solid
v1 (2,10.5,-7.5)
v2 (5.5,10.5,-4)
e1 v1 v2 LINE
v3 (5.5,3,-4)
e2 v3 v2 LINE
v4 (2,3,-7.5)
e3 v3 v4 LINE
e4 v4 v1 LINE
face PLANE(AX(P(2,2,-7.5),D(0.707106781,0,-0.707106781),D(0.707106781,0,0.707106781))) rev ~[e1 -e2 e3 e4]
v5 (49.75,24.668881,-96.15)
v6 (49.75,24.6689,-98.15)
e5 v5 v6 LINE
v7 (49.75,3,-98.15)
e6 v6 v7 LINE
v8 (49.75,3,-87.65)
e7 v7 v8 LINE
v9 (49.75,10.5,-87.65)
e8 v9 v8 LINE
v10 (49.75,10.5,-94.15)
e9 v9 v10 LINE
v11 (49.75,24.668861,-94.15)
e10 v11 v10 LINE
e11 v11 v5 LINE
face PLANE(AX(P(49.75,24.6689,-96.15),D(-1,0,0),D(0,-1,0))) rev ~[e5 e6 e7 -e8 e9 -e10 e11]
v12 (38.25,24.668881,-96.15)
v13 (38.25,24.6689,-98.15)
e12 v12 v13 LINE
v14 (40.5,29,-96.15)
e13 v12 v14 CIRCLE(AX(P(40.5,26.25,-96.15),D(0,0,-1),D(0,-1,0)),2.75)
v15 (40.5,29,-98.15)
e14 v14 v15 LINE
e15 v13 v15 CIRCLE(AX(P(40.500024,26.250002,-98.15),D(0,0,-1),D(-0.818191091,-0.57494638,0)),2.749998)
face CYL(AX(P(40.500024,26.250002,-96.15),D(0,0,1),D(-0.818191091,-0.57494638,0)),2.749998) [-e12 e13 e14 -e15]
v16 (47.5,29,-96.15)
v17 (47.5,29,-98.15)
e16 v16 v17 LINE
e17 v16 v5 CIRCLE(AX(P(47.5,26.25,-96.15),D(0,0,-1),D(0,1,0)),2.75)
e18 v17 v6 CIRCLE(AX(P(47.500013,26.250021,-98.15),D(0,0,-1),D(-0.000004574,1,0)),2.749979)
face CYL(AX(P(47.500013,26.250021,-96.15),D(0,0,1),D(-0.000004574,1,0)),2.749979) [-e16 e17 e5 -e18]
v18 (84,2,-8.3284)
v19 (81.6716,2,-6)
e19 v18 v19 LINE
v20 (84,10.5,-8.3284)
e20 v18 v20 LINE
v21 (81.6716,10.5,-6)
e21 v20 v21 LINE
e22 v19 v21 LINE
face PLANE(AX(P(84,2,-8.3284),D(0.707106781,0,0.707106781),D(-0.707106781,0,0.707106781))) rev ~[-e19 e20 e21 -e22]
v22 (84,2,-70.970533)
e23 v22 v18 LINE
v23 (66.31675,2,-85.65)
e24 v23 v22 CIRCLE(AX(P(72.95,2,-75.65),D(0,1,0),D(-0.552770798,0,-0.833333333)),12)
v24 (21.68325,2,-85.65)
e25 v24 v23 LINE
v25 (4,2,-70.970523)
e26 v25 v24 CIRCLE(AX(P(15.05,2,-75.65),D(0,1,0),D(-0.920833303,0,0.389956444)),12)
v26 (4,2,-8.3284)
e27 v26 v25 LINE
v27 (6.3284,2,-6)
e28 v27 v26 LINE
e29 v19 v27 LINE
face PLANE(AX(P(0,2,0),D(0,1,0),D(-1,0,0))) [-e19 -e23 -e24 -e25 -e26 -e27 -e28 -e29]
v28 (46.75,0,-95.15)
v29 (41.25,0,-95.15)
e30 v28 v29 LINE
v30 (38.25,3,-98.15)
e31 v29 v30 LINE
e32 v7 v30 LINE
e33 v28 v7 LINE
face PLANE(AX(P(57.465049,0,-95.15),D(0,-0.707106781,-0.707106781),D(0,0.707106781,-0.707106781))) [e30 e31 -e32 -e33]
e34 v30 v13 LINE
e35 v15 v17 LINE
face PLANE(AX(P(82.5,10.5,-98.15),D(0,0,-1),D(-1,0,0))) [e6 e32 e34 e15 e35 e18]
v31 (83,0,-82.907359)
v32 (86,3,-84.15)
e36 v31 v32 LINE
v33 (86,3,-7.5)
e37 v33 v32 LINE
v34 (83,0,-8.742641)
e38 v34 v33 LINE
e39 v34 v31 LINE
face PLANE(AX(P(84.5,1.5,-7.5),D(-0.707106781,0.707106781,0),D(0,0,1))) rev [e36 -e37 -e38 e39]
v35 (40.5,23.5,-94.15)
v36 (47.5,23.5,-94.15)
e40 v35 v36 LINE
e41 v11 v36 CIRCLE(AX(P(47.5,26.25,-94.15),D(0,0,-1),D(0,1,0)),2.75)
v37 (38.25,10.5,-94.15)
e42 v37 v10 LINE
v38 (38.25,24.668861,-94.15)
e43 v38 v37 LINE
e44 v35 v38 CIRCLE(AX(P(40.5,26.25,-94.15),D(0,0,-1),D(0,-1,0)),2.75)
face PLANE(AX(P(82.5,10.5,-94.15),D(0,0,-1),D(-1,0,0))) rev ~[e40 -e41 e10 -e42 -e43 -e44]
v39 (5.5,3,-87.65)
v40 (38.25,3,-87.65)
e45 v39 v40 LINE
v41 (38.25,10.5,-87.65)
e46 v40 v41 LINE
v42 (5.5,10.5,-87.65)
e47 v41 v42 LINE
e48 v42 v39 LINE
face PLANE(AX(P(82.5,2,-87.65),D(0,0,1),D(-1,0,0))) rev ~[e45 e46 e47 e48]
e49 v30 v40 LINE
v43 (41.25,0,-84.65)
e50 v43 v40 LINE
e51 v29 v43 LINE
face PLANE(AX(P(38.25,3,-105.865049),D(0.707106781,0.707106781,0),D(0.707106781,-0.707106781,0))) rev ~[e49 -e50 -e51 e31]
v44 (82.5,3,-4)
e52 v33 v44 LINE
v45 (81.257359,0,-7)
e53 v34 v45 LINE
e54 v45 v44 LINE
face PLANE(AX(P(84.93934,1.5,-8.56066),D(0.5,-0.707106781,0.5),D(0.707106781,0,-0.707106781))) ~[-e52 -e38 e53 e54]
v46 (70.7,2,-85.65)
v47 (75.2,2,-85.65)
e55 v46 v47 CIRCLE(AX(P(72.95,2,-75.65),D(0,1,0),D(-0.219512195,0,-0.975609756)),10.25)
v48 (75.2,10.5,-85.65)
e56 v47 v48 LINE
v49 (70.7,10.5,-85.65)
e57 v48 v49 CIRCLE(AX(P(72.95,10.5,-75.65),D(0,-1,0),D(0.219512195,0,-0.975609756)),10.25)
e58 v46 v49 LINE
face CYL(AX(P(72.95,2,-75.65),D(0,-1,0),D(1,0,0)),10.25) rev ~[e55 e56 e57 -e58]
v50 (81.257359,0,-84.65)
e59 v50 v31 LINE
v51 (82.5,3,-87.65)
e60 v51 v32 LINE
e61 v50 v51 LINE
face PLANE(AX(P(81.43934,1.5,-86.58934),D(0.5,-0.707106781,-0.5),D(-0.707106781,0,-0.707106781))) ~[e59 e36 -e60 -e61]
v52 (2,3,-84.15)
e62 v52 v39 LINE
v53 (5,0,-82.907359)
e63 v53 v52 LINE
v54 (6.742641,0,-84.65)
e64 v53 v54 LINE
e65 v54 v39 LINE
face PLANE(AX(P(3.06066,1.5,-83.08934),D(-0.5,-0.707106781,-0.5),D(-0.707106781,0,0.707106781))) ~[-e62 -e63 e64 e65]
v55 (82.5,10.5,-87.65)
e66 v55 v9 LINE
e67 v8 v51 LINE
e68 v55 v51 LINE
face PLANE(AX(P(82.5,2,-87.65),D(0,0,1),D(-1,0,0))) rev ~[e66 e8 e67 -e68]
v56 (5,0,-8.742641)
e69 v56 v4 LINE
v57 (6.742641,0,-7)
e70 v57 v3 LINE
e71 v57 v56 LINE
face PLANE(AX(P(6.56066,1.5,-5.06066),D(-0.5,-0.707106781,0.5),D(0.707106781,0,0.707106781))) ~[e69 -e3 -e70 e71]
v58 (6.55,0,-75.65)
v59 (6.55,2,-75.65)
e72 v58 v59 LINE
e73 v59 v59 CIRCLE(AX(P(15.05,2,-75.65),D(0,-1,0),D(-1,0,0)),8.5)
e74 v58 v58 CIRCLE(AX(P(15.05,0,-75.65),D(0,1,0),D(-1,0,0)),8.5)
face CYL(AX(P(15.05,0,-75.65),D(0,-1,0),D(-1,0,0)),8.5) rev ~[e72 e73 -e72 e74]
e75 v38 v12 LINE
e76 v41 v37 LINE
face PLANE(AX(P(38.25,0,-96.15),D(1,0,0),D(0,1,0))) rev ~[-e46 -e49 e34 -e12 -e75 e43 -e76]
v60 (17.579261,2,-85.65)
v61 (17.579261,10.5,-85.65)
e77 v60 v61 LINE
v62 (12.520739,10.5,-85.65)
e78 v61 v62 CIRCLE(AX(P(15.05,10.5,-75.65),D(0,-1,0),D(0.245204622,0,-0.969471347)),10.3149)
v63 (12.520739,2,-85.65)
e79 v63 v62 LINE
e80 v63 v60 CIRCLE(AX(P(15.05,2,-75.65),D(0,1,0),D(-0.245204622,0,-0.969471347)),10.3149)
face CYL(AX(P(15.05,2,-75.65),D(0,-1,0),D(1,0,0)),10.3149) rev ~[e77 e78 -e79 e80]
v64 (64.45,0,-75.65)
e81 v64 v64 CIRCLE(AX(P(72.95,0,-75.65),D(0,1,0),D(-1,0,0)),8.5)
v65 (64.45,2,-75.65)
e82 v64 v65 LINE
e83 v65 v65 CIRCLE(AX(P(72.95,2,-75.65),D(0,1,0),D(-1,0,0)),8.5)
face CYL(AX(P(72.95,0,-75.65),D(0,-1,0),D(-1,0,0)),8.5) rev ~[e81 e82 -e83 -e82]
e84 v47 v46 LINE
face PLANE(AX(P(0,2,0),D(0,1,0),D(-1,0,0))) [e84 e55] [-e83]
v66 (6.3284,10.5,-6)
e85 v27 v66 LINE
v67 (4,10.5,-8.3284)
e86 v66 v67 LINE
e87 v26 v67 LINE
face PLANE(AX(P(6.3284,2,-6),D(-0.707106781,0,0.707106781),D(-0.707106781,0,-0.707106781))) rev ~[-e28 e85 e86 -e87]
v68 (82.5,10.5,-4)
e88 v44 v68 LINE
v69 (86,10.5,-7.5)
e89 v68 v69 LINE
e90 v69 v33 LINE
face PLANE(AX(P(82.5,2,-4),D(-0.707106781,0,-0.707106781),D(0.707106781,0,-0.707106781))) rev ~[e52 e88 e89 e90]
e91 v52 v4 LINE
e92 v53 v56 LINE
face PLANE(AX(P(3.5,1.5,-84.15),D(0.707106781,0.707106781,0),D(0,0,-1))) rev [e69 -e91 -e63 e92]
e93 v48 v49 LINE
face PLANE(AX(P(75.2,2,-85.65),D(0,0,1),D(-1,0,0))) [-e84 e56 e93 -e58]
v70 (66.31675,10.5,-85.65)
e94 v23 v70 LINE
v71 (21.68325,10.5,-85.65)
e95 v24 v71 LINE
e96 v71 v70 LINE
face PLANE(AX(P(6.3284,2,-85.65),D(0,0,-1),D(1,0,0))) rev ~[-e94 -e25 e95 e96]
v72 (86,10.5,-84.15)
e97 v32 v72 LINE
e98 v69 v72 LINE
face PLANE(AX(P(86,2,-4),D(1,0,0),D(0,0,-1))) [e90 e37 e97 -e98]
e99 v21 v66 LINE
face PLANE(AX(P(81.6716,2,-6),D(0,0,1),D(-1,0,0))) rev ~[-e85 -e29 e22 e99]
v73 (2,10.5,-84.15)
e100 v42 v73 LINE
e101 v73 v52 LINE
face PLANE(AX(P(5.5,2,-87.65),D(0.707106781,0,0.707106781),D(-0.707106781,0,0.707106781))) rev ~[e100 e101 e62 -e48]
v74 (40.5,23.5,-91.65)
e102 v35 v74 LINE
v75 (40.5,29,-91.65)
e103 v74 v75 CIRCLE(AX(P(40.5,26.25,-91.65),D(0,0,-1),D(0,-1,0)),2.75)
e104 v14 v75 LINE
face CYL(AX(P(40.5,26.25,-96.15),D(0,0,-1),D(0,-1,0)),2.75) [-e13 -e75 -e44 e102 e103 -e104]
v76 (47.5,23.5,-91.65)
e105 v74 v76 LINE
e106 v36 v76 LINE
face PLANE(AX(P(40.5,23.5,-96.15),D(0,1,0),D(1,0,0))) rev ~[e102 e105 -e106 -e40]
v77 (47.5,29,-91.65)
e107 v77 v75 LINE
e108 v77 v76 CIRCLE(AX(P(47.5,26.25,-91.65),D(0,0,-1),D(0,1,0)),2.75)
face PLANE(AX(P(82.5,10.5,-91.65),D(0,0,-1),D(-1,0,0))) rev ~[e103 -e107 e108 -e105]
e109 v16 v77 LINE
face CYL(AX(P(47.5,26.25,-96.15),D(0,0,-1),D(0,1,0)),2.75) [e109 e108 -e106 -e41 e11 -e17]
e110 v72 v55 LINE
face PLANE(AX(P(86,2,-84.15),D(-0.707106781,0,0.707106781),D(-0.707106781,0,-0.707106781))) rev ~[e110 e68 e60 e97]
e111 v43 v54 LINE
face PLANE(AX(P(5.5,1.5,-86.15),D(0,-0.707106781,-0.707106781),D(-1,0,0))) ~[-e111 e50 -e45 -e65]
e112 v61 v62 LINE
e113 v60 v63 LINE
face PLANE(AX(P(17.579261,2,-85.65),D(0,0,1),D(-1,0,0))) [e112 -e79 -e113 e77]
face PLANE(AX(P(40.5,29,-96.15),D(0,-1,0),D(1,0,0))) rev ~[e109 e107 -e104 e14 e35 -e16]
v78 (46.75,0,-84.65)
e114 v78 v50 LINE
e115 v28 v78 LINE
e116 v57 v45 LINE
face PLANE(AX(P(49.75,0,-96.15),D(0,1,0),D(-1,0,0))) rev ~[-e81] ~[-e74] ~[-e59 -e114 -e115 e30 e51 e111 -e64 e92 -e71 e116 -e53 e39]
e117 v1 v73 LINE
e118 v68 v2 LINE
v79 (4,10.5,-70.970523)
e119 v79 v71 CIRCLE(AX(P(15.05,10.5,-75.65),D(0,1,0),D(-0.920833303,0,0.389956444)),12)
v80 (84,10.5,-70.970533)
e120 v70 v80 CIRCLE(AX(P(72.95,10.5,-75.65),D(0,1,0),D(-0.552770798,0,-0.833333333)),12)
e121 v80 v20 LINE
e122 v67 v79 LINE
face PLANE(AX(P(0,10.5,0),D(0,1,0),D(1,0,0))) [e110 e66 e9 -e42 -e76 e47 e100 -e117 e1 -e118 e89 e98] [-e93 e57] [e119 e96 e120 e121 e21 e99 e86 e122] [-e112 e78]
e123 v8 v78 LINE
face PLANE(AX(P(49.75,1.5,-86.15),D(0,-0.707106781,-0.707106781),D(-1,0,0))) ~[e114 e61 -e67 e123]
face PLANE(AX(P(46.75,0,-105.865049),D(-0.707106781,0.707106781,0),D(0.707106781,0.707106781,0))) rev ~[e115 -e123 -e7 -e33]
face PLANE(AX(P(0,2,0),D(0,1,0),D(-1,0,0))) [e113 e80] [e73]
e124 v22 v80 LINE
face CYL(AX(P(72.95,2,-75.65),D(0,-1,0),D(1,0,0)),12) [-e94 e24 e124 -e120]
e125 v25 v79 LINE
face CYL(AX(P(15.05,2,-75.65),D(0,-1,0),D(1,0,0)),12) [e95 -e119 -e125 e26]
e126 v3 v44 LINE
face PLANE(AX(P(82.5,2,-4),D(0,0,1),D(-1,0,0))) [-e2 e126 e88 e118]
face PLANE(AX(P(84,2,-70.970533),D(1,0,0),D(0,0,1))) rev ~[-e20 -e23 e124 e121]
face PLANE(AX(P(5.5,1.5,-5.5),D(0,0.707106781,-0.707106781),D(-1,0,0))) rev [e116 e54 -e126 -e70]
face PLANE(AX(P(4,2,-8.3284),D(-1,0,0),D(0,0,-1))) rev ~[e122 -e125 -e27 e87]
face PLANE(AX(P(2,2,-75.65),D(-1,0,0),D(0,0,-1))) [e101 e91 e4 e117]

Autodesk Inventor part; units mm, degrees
ref_plane "YZ Plane" through (0, 0, 0) normal (1, 0, 0) x (0, 1, 0)
ref_plane "XZ Plane" through (0, 0, 0) normal (0, 1, 0) x (-1, 0, 0)
ref_plane "XY Plane" through (0, 0, 0) normal (0, 0, 1) x (1, 0, 0)
sketch "Sketch1" plane through (0, 0, 0) normal (0, 1, 0) x (-1, 0, 0)
  line L0 (0, 0) -> (-88, 0)
  line L1 (-88, 0) -> (-88, -94)
  line L2 (-88, -94) -> (0, -94)
  line L3 (0, -94) -> (0, 0)
  line L4 (0, -94) -> (0, -75.65)
  line L5 (0, -94) -> (-15.05, -94)
  circle A0 centre (-15.05, -75.65) radius 8.5
  line L6 (-44, -88.9444) -> (-44, -54.2543) construction
  circle A1 centre (-72.95, -75.65) radius 8.5
  line L7 (-15.05, -94) -> (-15.05, -77.2221)
  line L8 (-15.05, -77.2221) -> (-15.05, -73.1555)
  dimension "d0" = 88
  dimension "d1" = 94
  dimension "d2" = 18.35
  dimension "d3" = 15.05
  dimension "d4" = 17
  dimension "d48" = 17
extrude "Extrusion1" add sketch "Sketch1" along normal blind 2
sketch "Sketch3" plane through (0, 2, 0) normal (0, 1, 0) x (1, 0, 0)
  circle A0 centre (72.95, 75.65) radius 8.5 construction
  circle A1 centre (15.05, 75.65) radius 8.5 construction
  line L0 (0, 0) -> (4, 0) construction
  line L1 (4, 0) -> (4, 6) construction
  line L2 (4, 6) -> (0, 6) construction
  line L3 (0, 6) -> (0, 0) construction
  line L4 (88, 0) -> (84, 0) construction
  line L5 (84, 0) -> (84, 6) construction
  line L6 (84, 6) -> (88, 6) construction
  line L7 (88, 6) -> (88, 0) construction
  line L8 (4, 6) -> (2, 6) construction
  line L9 (2, 6) -> (2, 4) construction
  line L10 (2, 4) -> (4, 4) construction
  line L11 (4, 4) -> (4, 6) construction
  line L12 (2, 4) -> (6, 4)
  line L13 (6, 4) -> (6, 6)
  line L14 (6, 6) -> (2, 6)
  line L15 (2, 6) -> (2, 4)
  line L16 (2, 4) -> (4, 4)
  line L17 (4, 4) -> (4, 8)
  line L18 (4, 8) -> (2, 8)
  line L19 (2, 8) -> (2, 4)
  line L20 (86, 4) -> (82, 4)
  line L21 (82, 4) -> (82, 4)
  line L22 (82, 4) -> (86, 4)
  line L23 (86, 4) -> (86, 4)
  line L24 (86, 4) -> (84, 4)
  line L25 (84, 4) -> (84, 8)
  line L26 (84, 8) -> (86, 8)
  line L27 (86, 8) -> (86, 4)
  line L28 (44, 4.3599) -> (37, 4.3599) construction
  line L29 (88, -1) -> (0, -1) construction
  line L30 (37, -1) -> (51, -1) construction
  line L31 (51, -1) -> (51, 0) construction
  line L32 (51, 0) -> (37, 0) construction
  line L33 (37, 0) -> (37, -1) construction
  line L34 (37, -1) -> (51, -1)
  line L35 (51, -1) -> (51, 0)
  line L36 (51, 0) -> (37, 0)
  line L37 (37, 0) -> (37, -1)
  line L38 (0, 95) -> (88, 95) projected
  line L39 (37, 95) -> (51, 95)
  line L40 (51, 95) -> (51, 94)
  line L41 (51, 94) -> (37, 94)
  line L42 (37, 94) -> (37, 95)
  circle A2 centre (15.05, 75.65) radius 10.5
  circle A3 centre (15.05, 75.65) radius 12
  line L43 (15.05, 75.65) -> (27.05, 75.65) construction
  line L44 (15.05, 75.65) -> (21.05, 86.0423) construction
  line L45 (15.05, 75.65) -> (9.05, 86.0423) construction
  line L46 (15.05, 75.65) -> (3.05, 75.65) construction
  line L47 (15.05, 75.65) -> (9.05, 65.2577) construction
  line L48 (15.05, 75.65) -> (21.05, 65.2577) construction
  line L49 (9.8, 84.7433) -> (9.05, 86.0423) construction
  line L50 (9.8, 84.7433) -> (9.05, 86.0423)
  line L51 (21.05, 86.0423) -> (20.3, 84.7433)
  line L52 (25.55, 75.65) -> (27.05, 75.65)
  line L53 (21.05, 65.2577) -> (20.3, 66.5567)
  line L54 (9.8, 66.5567) -> (9.05, 65.2577)
  line L55 (4.55, 75.65) -> (3.05, 75.65)
  line L56 (44, 84.7433) -> (44, 74.6259) construction
  circle A4 centre (72.95, 75.65) radius 8.5 construction
  circle A5 centre (72.95, 75.65) radius 10.5
  circle A6 centre (72.95, 75.65) radius 12
  line L57 (72.95, 75.65) -> (60.95, 75.65) construction
  line L58 (72.95, 75.65) -> (66.95, 86.0423) construction
  line L59 (72.95, 75.65) -> (78.95, 86.0423) construction
  line L60 (72.95, 75.65) -> (84.95, 75.65) construction
  line L61 (72.95, 75.65) -> (78.95, 65.2577) construction
  line L62 (72.95, 75.65) -> (66.95, 65.2577) construction
  line L63 (78.2, 84.7433) -> (78.95, 86.0423) construction
  line L64 (78.2, 84.7433) -> (78.95, 86.0423)
  line L65 (66.95, 86.0423) -> (67.7, 84.7433)
  line L66 (62.45, 75.65) -> (60.95, 75.65)
  line L67 (66.95, 65.2577) -> (67.7, 66.5567)
  line L68 (78.2, 66.5567) -> (78.95, 65.2577)
  line L69 (83.45, 75.65) -> (84.95, 75.65)
  line L70 (86, 4) -> (82, 4)
  line L71 (82, 4) -> (82, 6)
  line L72 (82, 6) -> (86, 6)
  line L73 (86, 6) -> (86, 4)
  point P0 (2, 4)
  point P1 (4, 6)
  point P2 (84, 4)
  point P3 (84.95, 75.65)
  point P4 (78.95, 65.2577)
  point P5 (3.05, 75.65)
  point P6 (9.05, 65.2577)
  point P7 (84, 6)
  dimension "d11" = 4
  dimension "d12" = 6
  dimension "d13" = 4
  dimension "d14" = 6
  dimension "d15" = 2
  dimension "d16" = 2
  dimension "d17" = 4
  dimension "d18" = 4
  dimension "d19" = 4
  dimension "d20" = 2
  dimension "d21" = 4
  dimension "d22" = 7
  dimension "d23" = 14
  dimension "d24" = 14
  dimension "d25" = 1
  dimension "d26" = 2
  dimension "d27" = 1.5
  dimension "d30" = 360
extrude "Extrusion3" add sketch "Sketch3" along normal blind 8.5 contours L52 A3 L53 A2 | A2 L50 A3 L51 | L54 A3 L55 A2 | L69 A6 L68 A5 | A5 L65 A6 L64 | L67 A6 L66 A5
sketch "Sketch7" plane through (0, 2, 0) normal (0, 1, 0) x (1, 0, 0)
  line L0 (3.05, 75.65) -> (4.55, 75.65) construction
  arc A0 (4.55, 75.65) -> (9.8, 66.5567) centre (15.05, 75.65) ccw construction
  line L1 (9.8, 66.5567) -> (9.05, 65.2577) construction
  arc A1 (3.05, 75.65) -> (9.05, 65.2577) centre (15.05, 75.65) ccw construction
  arc A2 (78.95, 65.2577) -> (84.95, 75.65) centre (72.95, 75.65) ccw construction
  line L2 (78.95, 65.2577) -> (78.2, 66.5567) construction
  arc A3 (78.2, 66.5567) -> (83.45, 75.65) centre (72.95, 75.65) ccw construction
  line L3 (83.45, 75.65) -> (84.95, 75.65) construction
  arc A4 (78.2, 84.7433) -> (67.7, 84.7433) centre (72.95, 75.65) ccw construction
  line L4 (67.7, 84.7433) -> (66.95, 86.0423) construction
  arc A5 (78.95, 86.0423) -> (66.95, 86.0423) centre (72.95, 75.65) ccw construction
  line L5 (78.95, 86.0423) -> (78.2, 84.7433) construction
  line L6 (21.05, 86.0423) -> (20.3, 84.7433) construction
  arc A6 (20.3, 84.7433) -> (9.8, 84.7433) centre (15.05, 75.65) ccw construction
  line L7 (9.8, 84.7433) -> (9.05, 86.0423) construction
  arc A7 (21.05, 86.0423) -> (9.05, 86.0423) centre (15.05, 75.65) ccw construction
  arc A8 (62.45, 75.65) -> (67.7, 66.5567) centre (72.95, 75.65) ccw construction
  line L8 (67.7, 66.5567) -> (66.95, 65.2577) construction
  arc A9 (60.95, 75.65) -> (66.95, 65.2577) centre (72.95, 75.65) ccw construction
  line L9 (60.95, 75.65) -> (62.45, 75.65) construction
  line L10 (25.55, 75.65) -> (27.05, 75.65) construction
  arc A10 (21.05, 65.2577) -> (27.05, 75.65) centre (15.05, 75.65) ccw construction
  line L11 (21.05, 65.2577) -> (20.3, 66.5567) construction
  arc A11 (20.3, 66.5567) -> (25.55, 75.65) centre (15.05, 75.65) ccw construction
  line L12 (88, 94) -> (0, 94) construction
  line L13 (0, 94) -> (0, 0) construction
  line L14 (0, 0) -> (88, 0) construction
  line L15 (88, 0) -> (88, 94) construction
  circle A12 centre (72.95, 75.65) radius 8.5 construction
  circle A13 centre (15.05, 75.65) radius 8.5 construction
  line L16 (2, 4) -> (86, 4) construction
  line L17 (86, 4) -> (86, 94) construction
  line L18 (86, 94) -> (2, 94) construction
  line L19 (2, 94) -> (2, 4) construction
  line L20 (0, 0) -> (88, 0)
  line L21 (88, 0) -> (88, 94)
  line L22 (88, 94) -> (0, 94)
  line L23 (0, 94) -> (0, 0)
  line L24 (86, 94) -> (2, 94)
  line L25 (2, 94) -> (2, 4)
  line L26 (2, 4) -> (86, 4)
  line L27 (86, 4) -> (86, 94)
  point P0 (2, 94)
extrude "Extrusion7" cut sketch "Sketch7" against normal up to surface (2 mm away) contours L23 L22 L25 L26 L27 L21 L20
sketch "Sketch8" plane through (0, 2, 0) normal (0, 1, 0) x (1, 0, 0)
  circle A0 centre (15.05, 75.65) radius 8.5 projected
  circle A1 centre (72.95, 75.65) radius 8.5 projected
  line L0 (86, 4) -> (86, 94) projected
  line L1 (86, 94) -> (2, 94) projected
  line L2 (2, 94) -> (2, 4) projected
  line L3 (3.05, 75.65) -> (4.55, 75.65) projected
  arc A2 (4.55, 75.65) -> (9.8, 66.5567) centre (15.05, 75.65) ccw projected
  line L4 (9.8, 66.5567) -> (9.05, 65.2577) projected
  arc A3 (3.05, 75.65) -> (9.05, 65.2577) centre (15.05, 75.65) ccw projected
  arc A4 (78.95, 65.2577) -> (84.95, 75.65) centre (72.95, 75.65) ccw projected
  line L5 (78.95, 65.2577) -> (78.2, 66.5567) projected
  arc A5 (78.2, 66.5567) -> (83.45, 75.65) centre (72.95, 75.65) ccw projected
  line L6 (83.45, 75.65) -> (84.95, 75.65) projected
  line L7 (25.55, 75.65) -> (27.05, 75.65) projected
  arc A6 (21.05, 65.2577) -> (27.05, 75.65) centre (15.05, 75.65) ccw projected
  line L8 (21.05, 65.2577) -> (20.3, 66.5567) projected
  arc A7 (20.3, 66.5567) -> (25.55, 75.65) centre (15.05, 75.65) ccw projected
  arc A8 (62.45, 75.65) -> (67.7, 66.5567) centre (72.95, 75.65) ccw projected
  line L9 (67.7, 66.5567) -> (66.95, 65.2577) projected
  arc A9 (60.95, 75.65) -> (66.95, 65.2577) centre (72.95, 75.65) ccw projected
  line L10 (60.95, 75.65) -> (62.45, 75.65) projected
  line L11 (21.05, 86.0423) -> (20.3, 84.7433) projected
  arc A10 (20.3, 84.7433) -> (9.8, 84.7433) centre (15.05, 75.65) ccw projected
  line L12 (9.8, 84.7433) -> (9.05, 86.0423) projected
  arc A11 (21.05, 86.0423) -> (9.05, 86.0423) centre (15.05, 75.65) ccw projected
  arc A12 (78.2, 84.7433) -> (67.7, 84.7433) centre (72.95, 75.65) ccw projected
  line L13 (67.7, 84.7433) -> (66.95, 86.0423) projected
  arc A13 (78.95, 86.0423) -> (66.95, 86.0423) centre (72.95, 75.65) ccw projected
  line L14 (78.95, 86.0423) -> (78.2, 84.7433) projected
  line L15 (86, 4) -> (2, 4) projected
  line L16 (2, 75.65) -> (86, 75.65)
  line L17 (86, 75.65) -> (86, 7.5)
  line L18 (82.5, 4) -> (5.5, 4)
  line L19 (2, 7.5) -> (2, 75.65)
  line L20 (2, 7.5) -> (5.5, 4)
  line L21 (82.5, 4) -> (86, 7.5)
  line L22 (4, 73.65) -> (84, 73.65)
  line L23 (84, 73.65) -> (84, 8.3284)
  line L24 (84, 8.3284) -> (81.6716, 6)
  line L25 (81.6716, 6) -> (6.3284, 6)
  line L26 (6.3284, 6) -> (4, 8.3284)
  line L27 (4, 8.3284) -> (4, 73.65)
  line L28 (2, 4) -> (86, 4) projected
  point P0 (0, 0)
  point P1 (2, 4)
  point P2 (4, 70.9705)
  point P3 (3.05, 75.65)
  point P4 (5.5, 4)
  point P5 (84.95, 75.65)
  point P6 (84, 70.9705)
  dimension "d51" = 3.5
  dimension "d52" = 3.5
  dimension "d53" = 3.5
  dimension "d54" = 3.5
  dimension "d55" = 2
extrude "Extrusion8" add sketch "Sketch8" along normal blind 8.5 contours A3 L27 L26 L25 L24 L23 A4 L16 L0 L21 L15 L20 L2
sketch "Sketch9" plane through (0, 2, 0) normal (0, 1, 0) x (1, 0, 0)
  line L0 (5.5, 4) -> (2, 7.5) projected
  line L1 (2, 7.5) -> (2, 4) projected
  line L2 (2, 4) -> (5.5, 4) projected
  line L3 (86, 4) -> (86, 7.5) projected
  line L4 (86, 7.5) -> (82.5, 4) projected
  line L5 (82.5, 4) -> (86, 4) projected
  line L6 (86, 4) -> (86, 7.5) projected
  line L7 (86, 94) -> (2, 94) projected
  line L8 (5.5, 4) -> (82.5, 4) projected
  line L9 (44, 4) -> (44, 94)
  line L10 (44, 49) -> (73.8977, 49)
  line L11 (5.5, 94) -> (2, 90.5)
  line L12 (2, 90.5) -> (2, 94)
  line L13 (2, 94) -> (5.5, 94)
  line L14 (86, 94) -> (86, 90.5)
  line L15 (86, 90.5) -> (82.5, 94)
  line L16 (82.5, 94) -> (86, 94)
  line L17 (86, 94) -> (86, 90.5)
  line L18 (5.5, 94) -> (82.5, 94)
  point P0 (0, 0)
  point P1 (0, 98)
extrude "Extrusion9" cut sketch "Sketch9" against normal blind 10 contours L2 L1 L0 | L5 L4 L3
sketch "Sketch10" plane through (0, 2, 0) normal (0, 1, 0) x (1, 0, 0)
  circle A0 centre (15.05, 75.65) radius 8.5 construction
  circle A1 centre (72.95, 75.65) radius 8.5 construction
  line L0 (21.05, 86.0423) -> (20.3, 84.7433) construction
  arc A2 (20.3, 84.7433) -> (9.8, 84.7433) centre (15.05, 75.65) ccw construction
  line L1 (9.8, 84.7433) -> (9.05, 86.0423) construction
  arc A3 (21.05, 86.0423) -> (9.05, 86.0423) centre (15.05, 75.65) ccw construction
  arc A4 (78.2, 84.7433) -> (67.7, 84.7433) centre (72.95, 75.65) ccw construction
  line L2 (67.7, 84.7433) -> (66.95, 86.0423) construction
  arc A5 (78.95, 86.0423) -> (66.95, 86.0423) centre (72.95, 75.65) ccw construction
  line L3 (78.95, 86.0423) -> (78.2, 84.7433) construction
  line L4 (25.55, 75.65) -> (27.05, 75.65) construction
  arc A6 (21.05, 65.2577) -> (27.05, 75.65) centre (15.05, 75.65) ccw construction
  line L5 (21.05, 65.2577) -> (20.3, 66.5567) construction
  arc A7 (20.3, 66.5567) -> (25.55, 75.65) centre (15.05, 75.65) ccw construction
  arc A8 (62.45, 75.65) -> (67.7, 66.5567) centre (72.95, 75.65) ccw construction
  line L6 (67.7, 66.5567) -> (66.95, 65.2577) construction
  arc A9 (60.95, 75.65) -> (66.95, 65.2577) centre (72.95, 75.65) ccw construction
  line L7 (60.95, 75.65) -> (62.45, 75.65) construction
  line L8 (83.45, 75.65) -> (86, 75.65) construction
  line L9 (86, 75.65) -> (86, 94) construction
  line L10 (86, 94) -> (2, 94) construction
  line L11 (2, 94) -> (2, 75.65) construction
  line L12 (2, 75.65) -> (4.55, 75.65) construction
  arc A10 (4.55, 75.65) -> (9.8, 66.5567) centre (15.05, 75.65) ccw construction
  line L13 (9.8, 66.5567) -> (9.05, 65.2577) construction
  arc A11 (4, 70.9705) -> (9.05, 65.2577) centre (15.05, 75.65) ccw construction
  line L14 (4, 70.9705) -> (4, 8.3284) construction
  line L15 (4, 8.3284) -> (6.3284, 6) construction
  line L16 (6.3284, 6) -> (81.6716, 6) construction
  line L17 (81.6716, 6) -> (84, 8.3284) construction
  line L18 (84, 8.3284) -> (84, 70.9705) construction
  arc A12 (78.95, 65.2577) -> (84, 70.9705) centre (72.95, 75.65) ccw construction
  line L19 (78.95, 65.2577) -> (78.2, 66.5567) construction
  arc A13 (78.2, 66.5567) -> (83.45, 75.65) centre (72.95, 75.65) ccw construction
  line L20 (15.05, 87.65) -> (72.95, 87.65) construction
  line L21 (72.95, 87.65) -> (82.5, 87.65) construction
  line L22 (86, 75.65) -> (86, 84.15) construction
  line L23 (82.5, 87.65) -> (86, 84.15) construction
  line L24 (15.05, 87.65) -> (5.5, 87.65) construction
  arc A14 (21.05, 86.0423) -> (9.05, 86.0423) centre (15.05, 75.65) ccw construction
  line L25 (2, 75.65) -> (2, 84.15) construction
  line L26 (5.5, 87.65) -> (2, 84.15) construction
  line L27 (4, 75.65) -> (4, 83.3216) construction
  line L28 (4, 83.3216) -> (6.3284, 85.65) construction
  line L29 (6.3284, 85.65) -> (14.65, 85.65) construction
  line L30 (14.65, 85.65) -> (72.95, 85.65) construction
  line L31 (72.95, 85.65) -> (81.6716, 85.65) construction
  line L32 (81.6716, 85.65) -> (84, 83.3216) construction
  line L33 (84, 83.3216) -> (84, 75.65) construction
  line L34 (2, 75.65) -> (4, 75.65)
  line L35 (4, 75.65) -> (4, 83.3216)
  line L36 (6.3284, 85.65) -> (4, 83.3216)
  line L37 (6.3284, 85.65) -> (81.6716, 85.65)
  line L38 (81.6716, 85.65) -> (84, 83.3216)
  line L39 (84, 83.3216) -> (84, 75.65)
  line L40 (84, 75.65) -> (86, 75.65)
  line L41 (86, 7.5) -> (86, 75.65) projected
  line L42 (86, 75.65) -> (86, 84.15)
  line L43 (86, 84.15) -> (82.5, 87.65)
  line L44 (82.5, 87.65) -> (5.5, 87.65)
  line L45 (5.5, 87.65) -> (2, 84.15)
  line L46 (2, 75.65) -> (2, 84.15)
  point P0 (0, 0)
  point P1 (86, 87.65)
  point P2 (2, 87.65)
  dimension "d60" = 3.5
  dimension "d61" = 3.5
  dimension "d62" = 3.5
  dimension "d63" = 3.5
  dimension "d64" = 2
extrude "Extrusion10" add sketch "Sketch10" along normal blind 8.5
sketch "Sketch11" plane through (0, 10.5, 0) normal (0, 1, 0) x (1, 0, 0)
  point P0 (0, 0)
sketch "Sketch12" plane through (0, 2, 0) normal (0, 1, 0) x (1, 0, 0)
  line L0 (82.5, 87.65) -> (86, 84.15) projected
  line L1 (86, 84.15) -> (86, 94) projected
  line L2 (86, 94) -> (2, 94) projected
  line L3 (2, 94) -> (2, 84.15) projected
  line L4 (2, 84.15) -> (5.5, 87.65) projected
  line L5 (5.5, 87.65) -> (82.5, 87.65) projected
  point P0 (0, 0)
extrude "Extrusion11" cut sketch "Sketch12" against normal blind 8.5
sketch "Sketch13" plane through (0, 2, 0) normal (0, 1, 0) x (1, 0, 0)
  arc A0 (62.45, 75.65) -> (67.7, 66.5567) centre (72.95, 75.65) ccw projected
  line L0 (67.7, 66.5567) -> (66.95, 65.2577) projected
  arc A1 (60.95, 75.65) -> (66.95, 65.2577) centre (72.95, 75.65) ccw projected
  line L1 (60.95, 75.65) -> (62.45, 75.65) projected
  line L2 (25.55, 75.65) -> (27.05, 75.65) projected
  arc A2 (21.05, 65.2577) -> (27.05, 75.65) centre (15.05, 75.65) ccw projected
  line L3 (21.05, 65.2577) -> (20.3, 66.5567) projected
  arc A3 (20.3, 66.5567) -> (25.55, 75.65) centre (15.05, 75.65) ccw projected
  circle A4 centre (72.95, 75.65) radius 8.5 projected
  circle A5 centre (15.05, 75.65) radius 8.5 projected
  line L4 (76.1516, 85.65) -> (69.7484, 85.65) projected
  arc A6 (69.7484, 85.65) -> (67.7, 84.7433) centre (72.95, 75.65) ccw projected
  line L5 (67.7, 84.7433) -> (67.1765, 85.65) projected
  line L6 (67.1765, 85.65) -> (20.8235, 85.65) projected
  line L7 (20.8235, 85.65) -> (20.3, 84.7433) projected
  arc A7 (20.3, 84.7433) -> (18.2516, 85.65) centre (15.05, 75.65) ccw projected
  line L8 (18.2516, 85.65) -> (11.8484, 85.65) projected
  arc A8 (11.8484, 85.65) -> (9.8, 84.7433) centre (15.05, 75.65) ccw projected
  line L9 (9.8, 84.7433) -> (9.2765, 85.65) projected
  line L10 (9.2765, 85.65) -> (6.3284, 85.65) projected
  line L11 (6.3284, 85.65) -> (4, 83.3216) projected
  line L12 (4, 83.3216) -> (4, 75.65) projected
  line L13 (4, 75.65) -> (4.55, 75.65) projected
  arc A9 (4.55, 75.65) -> (9.8, 66.5567) centre (15.05, 75.65) ccw projected
  line L14 (9.8, 66.5567) -> (9.05, 65.2577) projected
  arc A10 (4, 70.9705) -> (9.05, 65.2577) centre (15.05, 75.65) ccw projected
  line L15 (4, 70.9705) -> (4, 8.3284) projected
  line L16 (4, 8.3284) -> (6.3284, 6) projected
  line L17 (6.3284, 6) -> (81.6716, 6) projected
  line L18 (81.6716, 6) -> (84, 8.3284) projected
  line L19 (84, 8.3284) -> (84, 70.9705) projected
  arc A11 (78.95, 65.2577) -> (84, 70.9705) centre (72.95, 75.65) ccw projected
  line L20 (78.95, 65.2577) -> (78.2, 66.5567) projected
  arc A12 (78.2, 66.5567) -> (83.45, 75.65) centre (72.95, 75.65) ccw projected
  line L21 (83.45, 75.65) -> (84, 75.65) projected
  line L22 (84, 75.65) -> (84, 83.3216) projected
  line L23 (84, 83.3216) -> (81.6716, 85.65) projected
  line L24 (81.6716, 85.65) -> (78.7235, 85.65) projected
  line L25 (78.7235, 85.65) -> (78.2, 84.7433) projected
  arc A13 (78.2, 84.7433) -> (76.1516, 85.65) centre (72.95, 75.65) ccw projected
  circle A14 centre (15.05, 75.65) radius 10.3149
  circle A15 centre (15.05, 75.65) radius 11.75
  circle A16 centre (72.95, 75.65) radius 10.25
  circle A17 centre (72.95, 75.65) radius 11.75
  point P0 (0, 0)
  point P1 (8.8805, 85.65)
  point P2 (4, 79.645)
  point P3 (4.7351, 75.65)
  point P4 (9.8926, 84.5829)
  point P5 (9.175, 65.4742)
  point P6 (20.925, 65.4742)
  point P7 (20.2074, 66.7171)
  point P8 (9.8926, 66.7171)
  point P9 (26.8, 75.65)
  point P10 (21.2195, 85.65)
  point P11 (20.2074, 84.5829)
  point P12 (25.3649, 75.65)
  point P13 (67.075, 65.4742)
  point P14 (78.825, 65.4742)
  point P15 (78.075, 66.7732)
  point P16 (67.825, 66.7732)
  point P17 (83.2, 75.65)
  point P18 (84, 79.645)
  point P19 (79.1195, 85.65)
  point P20 (78.075, 84.5268)
  point P21 (66.7805, 85.65)
  point P22 (61.2, 75.65)
  point P23 (62.7, 75.65)
  point P24 (67.825, 84.5268)
  point P25 (12.5209, 85.65)
  point P26 (17.5791, 85.65)
  point P27 (70.7, 85.65)
  point P28 (75.2, 85.65)
extrude "Extrusion12" add sketch "Sketch13" along normal blind 8.5 contours L1 A17 L6 L5 A6 L4 A16 A13 L25 L24 L22 L21 A12 L20 L0 A0 | A0 L0 A17 L1 | A17 L0 A1 L1 | A17 L24 L25 A13 L4 A16 A6 L5 L6 | L20 A12 L21 L22 A17 | A15 L2 A3 L3 L14 A9 L13 L12 L10 L9 A8 L8 A14 A7 L7 L6 | L6 L7 A7 L8 A14 A8 L9 L10 A15 | L24 L23 L22 A17 | A15 L3 A3 L2 | L2 A2 L3 A15 | A15 L12 L11 L10 | L12 L13 A9 L14 A15 | A16 L4 | L8 A14 picked at (73.2018, 85.724) picked at (15.3336, 85.7433)
sketch "Sketch14" plane through (82.5, 10.5, -87.65) normal (0, 0, -1) x (-1, 0, 0)
  line L0 (0, 0) -> (77, 0) construction
  line L1 (0, 0) -> (0, -10.5) construction
  line L2 (77, -10.5) -> (0, -10.5) construction
  line L3 (77, 0) -> (77, -10.5) construction
  line L4 (44.25, -21) -> (32.75, -21) construction
  line L5 (32.75, -21) -> (32.75, 0) construction
  line L6 (32.75, 0) -> (44.25, 0) construction
  line L7 (44.25, 0) -> (44.25, -21) construction
  line L8 (44.25, -21) -> (32.75, 0) construction
  line L9 (32.75, -21) -> (44.25, 0) construction
  line L10 (44.25, -10.5) -> (32.75, -10.5) construction
  line L11 (32.75, 13.5) -> (32.75, 13.5) construction
  line L12 (32.75, 13.5) -> (44.25, 13.5) construction
  line L13 (44.25, 13.5) -> (44.25, 13.5) construction
  line L14 (42, 15.75) -> (35, 15.75) construction
  line L15 (32.75, 13.5) -> (32.75, 11.25) construction
  line L16 (35, 11.25) -> (42, 11.25) construction
  line L17 (44.25, 11.25) -> (44.25, 13.5) construction
  line L18 (44.25, 15.75) -> (32.75, 11.25) construction
  line L19 (32.75, 15.75) -> (44.25, 11.25) construction
  arc A0 (44.25, 13.5) -> (42, 15.75) centre (42, 13.5) ccw construction
  arc A1 (42, 11.25) -> (44.25, 13.5) centre (42, 13.5) ccw construction
  arc A2 (32.75, 13.5) -> (35, 11.25) centre (35, 13.5) ccw construction
  arc A3 (35, 15.75) -> (32.75, 13.5) centre (35, 13.5) ccw construction
  line L20 (44.25, 0) -> (32.75, 0)
  line L21 (32.75, 0) -> (32.75, -10.5)
  line L22 (32.75, -10.5) -> (44.25, -10.5)
  line L23 (44.25, -10.5) -> (44.25, 0)
  point P0 (82.5, -10.5)
  point P1 (38.5, -10.5)
  point P2 (38.5, 13.5)
  dimension "d71" = 11.5
  dimension "d72" = 24
  dimension "d73" = 4.5
  dimension "d74" = 2.25
extrude "Extrusion13" add sketch "Sketch14" along normal blind 6.5
sketch "Sketch15" plane through (82.5, 10.5, -94.15) normal (0, 0, -1) x (-1, 0, 0)
  line L0 (32.75, -10.5) -> (44.25, -10.5) projected
  line L1 (44.25, -10.5) -> (32.75, -10.5)
  line L2 (32.75, -10.5) -> (32.75, 15.75)
  line L3 (32.75, 15.75) -> (44.25, 15.75)
  line L4 (44.25, 15.75) -> (44.25, -10.5)
  line L5 (42, 18) -> (35, 18)
  line L6 (32.75, 15.75) -> (32.75, 13.5)
  line L7 (32.75, 13.5) -> (44.25, 13.5)
  line L8 (44.25, 13.5) -> (44.25, 15.75)
  line L9 (44.25, 18) -> (32.75, 13.5) construction
  line L10 (32.75, 18) -> (44.25, 13.5) construction
  arc A0 (44.25, 15.75) -> (42, 18) centre (42, 15.75) ccw
  arc A1 (35, 18) -> (32.75, 15.75) centre (35, 15.75) ccw
  point P0 (82.5, -10.5)
  point P1 (38.5, 15.75)
  point P2 (44.25, 15.75)
  dimension "d77" = 11.5
  dimension "d78" = 26.25
  dimension "d79" = 4.5
  dimension "d80" = 2.25
extrude "Extrusion14" add sketch "Sketch15" along normal blind 2
sketch "Sketch16" plane through (82.5, 10.5, -94.15) normal (0, 0, 1) x (1, 0, 0)
  line L0 (-44.25, 0) -> (-32.75, 0) construction
  line L1 (-32.75, 15.75) -> (-32.75, 0) construction
  arc A0 (-32.75, 15.75) -> (-35, 18) centre (-35, 15.75) ccw construction
  line L2 (-42, 18) -> (-35, 18) construction
  arc A1 (-42, 18) -> (-44.25, 15.75) centre (-42, 15.75) ccw construction
  line L3 (-44.25, 0) -> (-44.25, 15.75) construction
  circle A2 centre (-35, 15.75) radius 2.25 construction
  circle A3 centre (-42, 15.75) radius 2.25 construction
  line L4 (-35, 13.5) -> (-42, 13.5) construction
  line L5 (-35, 13.5) -> (-42, 13.5)
  line L6 (-42, 18) -> (-35, 18)
  arc A4 (-32.75, 15.75) -> (-35, 18) centre (-35, 15.75) ccw projected
  arc A5 (-35, 13.5) -> (-35, 18) centre (-35, 15.75) ccw
  arc A6 (-42, 18) -> (-42, 13.5) centre (-42, 15.75) ccw
  point P0 (-82.5, -10.5)
extrude "Extrusion15" add sketch "Sketch16" along normal blind 2.5
chamfer "Chamfer1" distance 3 angle 45 9 edges at (2, 0, -45.825) (3.75, 0, -85.9) (21.875, 0, -87.65) (66.125, 0, -87.65) (84.25, 0, -85.9) (86, 0, -45.825) (44, 0, -4) (84.25, 0, -5.75) (3.75, 0, -5.75)
sketch "Sketch17" plane through (82.5, 10.5, -96.15) normal (0, 0, -1) x (-1, 0, 0)
  line L0 (32.75, -10.5) -> (44.25, -10.5) construction
  line L1 (44.25, -10.5) -> (44.25, 15.75) construction
  arc A0 (44.25, 15.75) -> (42, 18) centre (42, 15.75) ccw construction
  line L2 (42, 18) -> (35, 18) construction
  arc A1 (35, 18) -> (32.75, 15.75) centre (35, 15.75) ccw construction
  line L3 (32.75, 15.75) -> (32.75, -10.5) construction
  arc A2 (44.75, 15.75) -> (42, 18.5) centre (42, 15.75) ccw construction
  line L4 (44.75, 15.75) -> (44.75, -11) construction
  line L5 (44.75, -11) -> (32.25, -11) construction
  line L6 (32.25, -11) -> (32.25, 15.75) construction
  arc A3 (35, 18.5) -> (32.25, 15.75) centre (35, 15.75) ccw construction
  line L7 (35, 18.5) -> (42, 18.5) construction
  circle A4 centre (42, 15.75) radius 2.75 construction
  circle A5 centre (35, 15.75) radius 2.75 construction
  line L8 (42, 13) -> (35, 13)
  line L9 (35, 18.5) -> (42, 18.5)
  arc A6 (42, 13) -> (42, 18.5) centre (42, 15.75) ccw
  arc A7 (35, 18.5) -> (35, 13) centre (35, 15.75) ccw
  point P0 (82.5, -10.5)
  dimension "d88" = 0.5
extrude "Extrusion16" add sketch "Sketch17" against normal up to surface (4.5 mm away)
sketch "Sketch18" plane through (82.5, 10.5, -96.15) normal (0, 0, -1) x (-1, 0, 0)
  arc A0 (44.25, 14.1689) -> (42, 18.5) centre (42, 15.75) ccw projected
  line L0 (42, 18.5) -> (35, 18.5) projected
  arc A1 (35, 18.5) -> (32.75, 14.1689) centre (35, 15.75) ccw projected
  line L1 (32.75, 14.1689) -> (32.75, -10.5) projected
  line L2 (32.75, -10.5) -> (44.25, -10.5) projected
  line L3 (44.25, -10.5) -> (44.25, 14.1689) projected
  point P0 (82.5, -10.5)
extrude "Extrusion17" add sketch "Sketch18" along normal blind 2
chamfer "Chamfer2" distance 3 angle 45 4 edges at (38.25, 0, -97.15) (38.25, 0, -90.4) (44, 0, -98.15) (49.75, 0, -90.4)
sketch "Sketch19" plane through (0, 2, 0) normal (0, 1, 0) x (1, 0, 0)
  arc A0 (9.175, 65.4742) -> (20.925, 65.4742) centre (15.05, 75.65) ccw projected
  line L0 (9.175, 65.4742) -> (9.05, 65.2577) projected
  arc A1 (4, 70.9705) -> (9.05, 65.2577) centre (15.05, 75.65) ccw projected
  line L1 (4, 70.9705) -> (4, 8.3284) projected
  line L2 (4, 8.3284) -> (6.3284, 6) projected
  line L3 (6.3284, 6) -> (81.6716, 6) projected
  line L4 (81.6716, 6) -> (84, 8.3284) projected
  line L5 (84, 8.3284) -> (84, 70.9705) projected
  arc A2 (78.95, 65.2577) -> (84, 70.9705) centre (72.95, 75.65) ccw projected
  line L6 (78.95, 65.2577) -> (78.825, 65.4742) projected
  arc A3 (67.075, 65.4742) -> (78.825, 65.4742) centre (72.95, 75.65) ccw projected
  line L7 (67.075, 65.4742) -> (66.95, 65.2577) projected
  arc A4 (60.95, 75.65) -> (66.95, 65.2577) centre (72.95, 75.65) ccw projected
  line L8 (60.95, 75.65) -> (61.2, 75.65) projected
  arc A5 (66.7805, 85.65) -> (61.2, 75.65) centre (72.95, 75.65) ccw projected
  line L9 (66.7805, 85.65) -> (21.2195, 85.65) projected
  arc A6 (26.8, 75.65) -> (21.2195, 85.65) centre (15.05, 75.65) ccw projected
  line L10 (26.8, 75.65) -> (27.05, 75.65) projected
  arc A7 (21.05, 65.2577) -> (27.05, 75.65) centre (15.05, 75.65) ccw projected
  line L11 (21.05, 65.2577) -> (20.925, 65.4742) projected
  arc A8 (21.05, 65.2577) -> (27.05, 75.65) centre (15.05, 75.65) ccw projected
  circle A9 centre (15.05, 75.65) radius 12
  circle A10 centre (72.95, 75.65) radius 12
  circle A11 centre (72.95, 75.65) radius 10.2605
  circle A12 centre (15.05, 75.65) radius 8.5
  line L12 (67.979, 86.572) -> (77.921, 86.572)
  line L13 (20.021, 86.572) -> (10.079, 86.572)
  point P0 (0, 0)
  point P1 (66.3168, 85.65)
  point P2 (21.6832, 85.65)
extrude "Extrusion18" add sketch "Sketch19" along normal blind 8.5 contours A0 L11 A9 L0 | L10 A6 L9 A9 | L9 A5 L8 A10 | L7 A3 L6 A10
equation "\"d52\" = d51"
equation "\"d53\" = d51"
equation "\"d54\" = d53"
equation "\"d61\" = d60"
equation "\"d63\" = d62"
properties part number "case_v1.4_b"
